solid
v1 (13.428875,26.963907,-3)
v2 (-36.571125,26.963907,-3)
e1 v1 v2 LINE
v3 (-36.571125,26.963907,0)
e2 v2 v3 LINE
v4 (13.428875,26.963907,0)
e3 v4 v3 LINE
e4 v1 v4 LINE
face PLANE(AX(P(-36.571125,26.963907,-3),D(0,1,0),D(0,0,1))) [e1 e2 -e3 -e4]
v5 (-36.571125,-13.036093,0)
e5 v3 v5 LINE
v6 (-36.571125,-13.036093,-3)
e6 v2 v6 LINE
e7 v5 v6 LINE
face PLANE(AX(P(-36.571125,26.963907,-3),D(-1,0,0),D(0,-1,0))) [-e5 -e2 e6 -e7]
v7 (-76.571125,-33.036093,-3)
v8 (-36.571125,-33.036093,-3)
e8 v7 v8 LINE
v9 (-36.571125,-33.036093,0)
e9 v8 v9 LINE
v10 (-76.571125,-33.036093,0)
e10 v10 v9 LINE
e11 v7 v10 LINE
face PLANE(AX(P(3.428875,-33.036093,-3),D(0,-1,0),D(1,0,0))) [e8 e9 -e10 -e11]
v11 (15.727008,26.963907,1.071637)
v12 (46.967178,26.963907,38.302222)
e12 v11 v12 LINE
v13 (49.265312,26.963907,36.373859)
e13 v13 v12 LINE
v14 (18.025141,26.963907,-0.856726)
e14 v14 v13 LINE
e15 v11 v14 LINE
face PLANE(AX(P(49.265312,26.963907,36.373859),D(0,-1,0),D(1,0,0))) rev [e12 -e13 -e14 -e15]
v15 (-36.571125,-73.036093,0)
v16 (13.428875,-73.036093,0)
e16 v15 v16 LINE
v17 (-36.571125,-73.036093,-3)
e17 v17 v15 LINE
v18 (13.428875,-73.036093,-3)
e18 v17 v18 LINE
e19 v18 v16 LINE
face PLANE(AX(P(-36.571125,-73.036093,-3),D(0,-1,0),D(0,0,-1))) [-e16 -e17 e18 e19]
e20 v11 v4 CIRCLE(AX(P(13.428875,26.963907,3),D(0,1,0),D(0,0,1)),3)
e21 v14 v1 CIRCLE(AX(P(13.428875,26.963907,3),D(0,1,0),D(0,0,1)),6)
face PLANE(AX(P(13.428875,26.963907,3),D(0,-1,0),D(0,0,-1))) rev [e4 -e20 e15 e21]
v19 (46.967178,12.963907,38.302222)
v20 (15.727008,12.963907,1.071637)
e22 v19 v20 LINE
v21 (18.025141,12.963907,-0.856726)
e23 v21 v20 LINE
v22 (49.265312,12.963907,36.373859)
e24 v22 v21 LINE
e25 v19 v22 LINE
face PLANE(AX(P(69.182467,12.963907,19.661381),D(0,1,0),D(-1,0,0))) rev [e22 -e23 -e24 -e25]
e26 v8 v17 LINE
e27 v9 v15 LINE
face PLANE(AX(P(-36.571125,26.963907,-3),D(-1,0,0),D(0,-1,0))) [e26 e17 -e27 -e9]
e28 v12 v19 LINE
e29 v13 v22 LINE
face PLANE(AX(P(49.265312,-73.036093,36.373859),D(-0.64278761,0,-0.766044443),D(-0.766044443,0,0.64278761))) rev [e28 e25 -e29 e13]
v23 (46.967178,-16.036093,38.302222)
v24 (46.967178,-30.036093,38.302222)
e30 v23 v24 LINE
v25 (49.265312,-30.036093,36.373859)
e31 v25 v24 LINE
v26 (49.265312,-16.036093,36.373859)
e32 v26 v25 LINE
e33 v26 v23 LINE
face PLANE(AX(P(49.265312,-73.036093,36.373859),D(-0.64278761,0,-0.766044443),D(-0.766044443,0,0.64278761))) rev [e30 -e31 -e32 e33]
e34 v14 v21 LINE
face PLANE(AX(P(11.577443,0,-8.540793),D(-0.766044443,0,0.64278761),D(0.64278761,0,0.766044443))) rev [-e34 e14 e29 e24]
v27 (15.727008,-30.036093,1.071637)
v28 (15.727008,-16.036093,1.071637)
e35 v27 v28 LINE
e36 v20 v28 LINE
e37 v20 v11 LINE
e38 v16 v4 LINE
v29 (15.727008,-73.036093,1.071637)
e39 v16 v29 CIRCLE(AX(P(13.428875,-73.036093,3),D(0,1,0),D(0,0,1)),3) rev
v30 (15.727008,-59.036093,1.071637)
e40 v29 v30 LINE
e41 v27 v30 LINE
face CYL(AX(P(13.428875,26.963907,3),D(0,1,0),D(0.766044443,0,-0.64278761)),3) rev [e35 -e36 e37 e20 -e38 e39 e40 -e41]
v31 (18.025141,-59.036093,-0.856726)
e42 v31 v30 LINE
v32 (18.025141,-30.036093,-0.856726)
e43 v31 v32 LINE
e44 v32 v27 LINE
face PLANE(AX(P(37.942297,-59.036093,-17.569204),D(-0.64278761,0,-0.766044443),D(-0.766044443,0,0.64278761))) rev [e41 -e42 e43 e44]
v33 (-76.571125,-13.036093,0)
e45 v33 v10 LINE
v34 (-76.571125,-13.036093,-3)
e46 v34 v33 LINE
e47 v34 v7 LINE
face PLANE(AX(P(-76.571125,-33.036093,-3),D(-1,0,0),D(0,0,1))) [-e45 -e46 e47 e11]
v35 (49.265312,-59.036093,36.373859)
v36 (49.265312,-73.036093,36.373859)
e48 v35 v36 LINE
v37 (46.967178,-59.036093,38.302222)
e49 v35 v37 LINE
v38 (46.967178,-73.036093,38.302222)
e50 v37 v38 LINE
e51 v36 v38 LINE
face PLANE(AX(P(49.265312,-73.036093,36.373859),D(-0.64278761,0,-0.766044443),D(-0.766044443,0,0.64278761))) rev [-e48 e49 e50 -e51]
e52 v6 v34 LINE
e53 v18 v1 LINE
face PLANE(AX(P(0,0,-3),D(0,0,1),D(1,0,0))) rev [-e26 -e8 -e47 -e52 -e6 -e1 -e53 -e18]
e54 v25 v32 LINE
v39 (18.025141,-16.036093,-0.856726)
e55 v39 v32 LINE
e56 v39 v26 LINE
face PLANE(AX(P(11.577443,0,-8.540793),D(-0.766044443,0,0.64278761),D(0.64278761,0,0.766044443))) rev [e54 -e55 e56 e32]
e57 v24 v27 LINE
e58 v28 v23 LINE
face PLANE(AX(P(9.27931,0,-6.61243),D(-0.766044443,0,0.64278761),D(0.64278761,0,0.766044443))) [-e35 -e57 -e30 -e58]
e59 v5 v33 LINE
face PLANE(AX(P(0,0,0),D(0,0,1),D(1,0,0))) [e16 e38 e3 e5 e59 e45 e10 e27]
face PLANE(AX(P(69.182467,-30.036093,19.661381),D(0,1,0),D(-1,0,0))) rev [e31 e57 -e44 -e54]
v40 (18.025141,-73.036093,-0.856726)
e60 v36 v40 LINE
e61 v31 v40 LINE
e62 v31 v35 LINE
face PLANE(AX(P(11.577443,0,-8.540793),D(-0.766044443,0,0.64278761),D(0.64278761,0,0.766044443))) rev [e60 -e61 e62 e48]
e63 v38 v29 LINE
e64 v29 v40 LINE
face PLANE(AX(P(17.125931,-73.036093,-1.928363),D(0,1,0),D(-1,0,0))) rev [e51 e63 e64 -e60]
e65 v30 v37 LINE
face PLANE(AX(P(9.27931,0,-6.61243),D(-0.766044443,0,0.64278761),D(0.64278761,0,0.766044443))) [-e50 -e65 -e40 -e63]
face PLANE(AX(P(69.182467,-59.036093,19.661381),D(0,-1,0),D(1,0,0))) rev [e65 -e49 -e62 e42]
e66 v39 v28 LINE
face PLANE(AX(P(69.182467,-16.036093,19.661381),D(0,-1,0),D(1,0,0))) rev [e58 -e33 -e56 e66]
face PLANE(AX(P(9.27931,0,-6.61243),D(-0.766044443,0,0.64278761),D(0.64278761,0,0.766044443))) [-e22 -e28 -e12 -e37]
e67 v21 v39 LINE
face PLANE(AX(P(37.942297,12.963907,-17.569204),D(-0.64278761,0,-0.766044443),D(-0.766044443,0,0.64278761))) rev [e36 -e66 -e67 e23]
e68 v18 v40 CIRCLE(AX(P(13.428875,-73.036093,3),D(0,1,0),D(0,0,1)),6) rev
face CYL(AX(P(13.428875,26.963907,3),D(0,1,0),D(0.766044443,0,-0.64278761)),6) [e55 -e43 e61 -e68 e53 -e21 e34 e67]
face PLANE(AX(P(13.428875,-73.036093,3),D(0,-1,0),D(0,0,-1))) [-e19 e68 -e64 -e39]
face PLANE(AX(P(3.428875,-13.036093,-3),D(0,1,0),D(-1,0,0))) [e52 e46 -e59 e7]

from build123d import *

# Parameters (mm, degrees)
SKETCH1_W          = 50
SKETCH1_H          = 100
BASE_FLANGE1_DEPTH = 3
EDGE_FLANGE2_DEPTH = 100
SKETCH12_W         = 48.601077025
SKETCH12_H         = 29
CUT_EXTRUDE1_DEPTH = 29
SKETCH13_W         = 48.601077025
SKETCH13_H         = 29
CUT_EXTRUDE2_DEPTH = 29
SKETCH14_W         = 80
SKETCH14_H         = 20
TAB1_DEPTH         = 3


# Sheet-metal steps are written as plain solids
with BuildPart() as part:
    # Sketch1 → Base-Flange1 (new body)
    with BuildSketch(Plane.XY):
        with Locations((-11.571125265, -23.036093418)):
            Rectangle(SKETCH1_W, SKETCH1_H)
    extrude(amount=-BASE_FLANGE1_DEPTH)

    # Edge-Flange2 section (across the edge) → Edge-Flange2 (add)
    with BuildSketch(Plane(origin=(14.827797709, -73.036093418, 0), x_dir=(-0.7660444431189746, 0, 0.6427876096865435), z_dir=(0, 1, 0))):
        with BuildLine():
            Line((-3, 1.398922974), (-3, 50))
            Line((-3, 50), (0, 50))
            Line((0, 50), (0, 1.398922974))
            ThreePointArc((0, 1.398922974), (0.281076639, 0.131068189), (1.071637171, -0.899210355))
            Line((1.071637171, -0.899210355), (-0.856725658, -3.197343684))
            ThreePointArc((-0.856725658, -3.197343684), (-2.437846722, -1.136786596), (-3, 1.398922974))
        make_face()
    extrude(amount=EDGE_FLANGE2_DEPTH)

    # Sketch12 → Cut-Extrude1 (cut)
    with BuildSketch(Plane(origin=(8.70130888, 0, -7.301265072), x_dir=(0.6427876096865439, 0, 0.7660444431189742), z_dir=(-0.7660444431189742, 0, 0.6427876096865439))):
        with Locations((35.230586133, -1.536093418)):
            Rectangle(SKETCH12_W, SKETCH12_H)
    extrude(amount=-CUT_EXTRUDE1_DEPTH, mode=Mode.SUBTRACT)

    # Sketch13 → Cut-Extrude2 (cut)
    with BuildSketch(Plane(origin=(8.70130888, 0, -7.301265072), x_dir=(0.6427876096865439, 0, 0.7660444431189742), z_dir=(-0.7660444431189742, 0, 0.6427876096865439))):
        with Locations((35.230586133, -44.536093418)):
            Rectangle(SKETCH13_W, SKETCH13_H)
    extrude(amount=-CUT_EXTRUDE2_DEPTH, mode=Mode.SUBTRACT)

    # Sketch14 → Tab1 (add)
    with BuildSketch(Plane.XY):
        with Locations((-36.571125265, -23.036093418)):
            Rectangle(SKETCH14_W, SKETCH14_H)
    extrude(amount=-TAB1_DEPTH)


solid = part.part
